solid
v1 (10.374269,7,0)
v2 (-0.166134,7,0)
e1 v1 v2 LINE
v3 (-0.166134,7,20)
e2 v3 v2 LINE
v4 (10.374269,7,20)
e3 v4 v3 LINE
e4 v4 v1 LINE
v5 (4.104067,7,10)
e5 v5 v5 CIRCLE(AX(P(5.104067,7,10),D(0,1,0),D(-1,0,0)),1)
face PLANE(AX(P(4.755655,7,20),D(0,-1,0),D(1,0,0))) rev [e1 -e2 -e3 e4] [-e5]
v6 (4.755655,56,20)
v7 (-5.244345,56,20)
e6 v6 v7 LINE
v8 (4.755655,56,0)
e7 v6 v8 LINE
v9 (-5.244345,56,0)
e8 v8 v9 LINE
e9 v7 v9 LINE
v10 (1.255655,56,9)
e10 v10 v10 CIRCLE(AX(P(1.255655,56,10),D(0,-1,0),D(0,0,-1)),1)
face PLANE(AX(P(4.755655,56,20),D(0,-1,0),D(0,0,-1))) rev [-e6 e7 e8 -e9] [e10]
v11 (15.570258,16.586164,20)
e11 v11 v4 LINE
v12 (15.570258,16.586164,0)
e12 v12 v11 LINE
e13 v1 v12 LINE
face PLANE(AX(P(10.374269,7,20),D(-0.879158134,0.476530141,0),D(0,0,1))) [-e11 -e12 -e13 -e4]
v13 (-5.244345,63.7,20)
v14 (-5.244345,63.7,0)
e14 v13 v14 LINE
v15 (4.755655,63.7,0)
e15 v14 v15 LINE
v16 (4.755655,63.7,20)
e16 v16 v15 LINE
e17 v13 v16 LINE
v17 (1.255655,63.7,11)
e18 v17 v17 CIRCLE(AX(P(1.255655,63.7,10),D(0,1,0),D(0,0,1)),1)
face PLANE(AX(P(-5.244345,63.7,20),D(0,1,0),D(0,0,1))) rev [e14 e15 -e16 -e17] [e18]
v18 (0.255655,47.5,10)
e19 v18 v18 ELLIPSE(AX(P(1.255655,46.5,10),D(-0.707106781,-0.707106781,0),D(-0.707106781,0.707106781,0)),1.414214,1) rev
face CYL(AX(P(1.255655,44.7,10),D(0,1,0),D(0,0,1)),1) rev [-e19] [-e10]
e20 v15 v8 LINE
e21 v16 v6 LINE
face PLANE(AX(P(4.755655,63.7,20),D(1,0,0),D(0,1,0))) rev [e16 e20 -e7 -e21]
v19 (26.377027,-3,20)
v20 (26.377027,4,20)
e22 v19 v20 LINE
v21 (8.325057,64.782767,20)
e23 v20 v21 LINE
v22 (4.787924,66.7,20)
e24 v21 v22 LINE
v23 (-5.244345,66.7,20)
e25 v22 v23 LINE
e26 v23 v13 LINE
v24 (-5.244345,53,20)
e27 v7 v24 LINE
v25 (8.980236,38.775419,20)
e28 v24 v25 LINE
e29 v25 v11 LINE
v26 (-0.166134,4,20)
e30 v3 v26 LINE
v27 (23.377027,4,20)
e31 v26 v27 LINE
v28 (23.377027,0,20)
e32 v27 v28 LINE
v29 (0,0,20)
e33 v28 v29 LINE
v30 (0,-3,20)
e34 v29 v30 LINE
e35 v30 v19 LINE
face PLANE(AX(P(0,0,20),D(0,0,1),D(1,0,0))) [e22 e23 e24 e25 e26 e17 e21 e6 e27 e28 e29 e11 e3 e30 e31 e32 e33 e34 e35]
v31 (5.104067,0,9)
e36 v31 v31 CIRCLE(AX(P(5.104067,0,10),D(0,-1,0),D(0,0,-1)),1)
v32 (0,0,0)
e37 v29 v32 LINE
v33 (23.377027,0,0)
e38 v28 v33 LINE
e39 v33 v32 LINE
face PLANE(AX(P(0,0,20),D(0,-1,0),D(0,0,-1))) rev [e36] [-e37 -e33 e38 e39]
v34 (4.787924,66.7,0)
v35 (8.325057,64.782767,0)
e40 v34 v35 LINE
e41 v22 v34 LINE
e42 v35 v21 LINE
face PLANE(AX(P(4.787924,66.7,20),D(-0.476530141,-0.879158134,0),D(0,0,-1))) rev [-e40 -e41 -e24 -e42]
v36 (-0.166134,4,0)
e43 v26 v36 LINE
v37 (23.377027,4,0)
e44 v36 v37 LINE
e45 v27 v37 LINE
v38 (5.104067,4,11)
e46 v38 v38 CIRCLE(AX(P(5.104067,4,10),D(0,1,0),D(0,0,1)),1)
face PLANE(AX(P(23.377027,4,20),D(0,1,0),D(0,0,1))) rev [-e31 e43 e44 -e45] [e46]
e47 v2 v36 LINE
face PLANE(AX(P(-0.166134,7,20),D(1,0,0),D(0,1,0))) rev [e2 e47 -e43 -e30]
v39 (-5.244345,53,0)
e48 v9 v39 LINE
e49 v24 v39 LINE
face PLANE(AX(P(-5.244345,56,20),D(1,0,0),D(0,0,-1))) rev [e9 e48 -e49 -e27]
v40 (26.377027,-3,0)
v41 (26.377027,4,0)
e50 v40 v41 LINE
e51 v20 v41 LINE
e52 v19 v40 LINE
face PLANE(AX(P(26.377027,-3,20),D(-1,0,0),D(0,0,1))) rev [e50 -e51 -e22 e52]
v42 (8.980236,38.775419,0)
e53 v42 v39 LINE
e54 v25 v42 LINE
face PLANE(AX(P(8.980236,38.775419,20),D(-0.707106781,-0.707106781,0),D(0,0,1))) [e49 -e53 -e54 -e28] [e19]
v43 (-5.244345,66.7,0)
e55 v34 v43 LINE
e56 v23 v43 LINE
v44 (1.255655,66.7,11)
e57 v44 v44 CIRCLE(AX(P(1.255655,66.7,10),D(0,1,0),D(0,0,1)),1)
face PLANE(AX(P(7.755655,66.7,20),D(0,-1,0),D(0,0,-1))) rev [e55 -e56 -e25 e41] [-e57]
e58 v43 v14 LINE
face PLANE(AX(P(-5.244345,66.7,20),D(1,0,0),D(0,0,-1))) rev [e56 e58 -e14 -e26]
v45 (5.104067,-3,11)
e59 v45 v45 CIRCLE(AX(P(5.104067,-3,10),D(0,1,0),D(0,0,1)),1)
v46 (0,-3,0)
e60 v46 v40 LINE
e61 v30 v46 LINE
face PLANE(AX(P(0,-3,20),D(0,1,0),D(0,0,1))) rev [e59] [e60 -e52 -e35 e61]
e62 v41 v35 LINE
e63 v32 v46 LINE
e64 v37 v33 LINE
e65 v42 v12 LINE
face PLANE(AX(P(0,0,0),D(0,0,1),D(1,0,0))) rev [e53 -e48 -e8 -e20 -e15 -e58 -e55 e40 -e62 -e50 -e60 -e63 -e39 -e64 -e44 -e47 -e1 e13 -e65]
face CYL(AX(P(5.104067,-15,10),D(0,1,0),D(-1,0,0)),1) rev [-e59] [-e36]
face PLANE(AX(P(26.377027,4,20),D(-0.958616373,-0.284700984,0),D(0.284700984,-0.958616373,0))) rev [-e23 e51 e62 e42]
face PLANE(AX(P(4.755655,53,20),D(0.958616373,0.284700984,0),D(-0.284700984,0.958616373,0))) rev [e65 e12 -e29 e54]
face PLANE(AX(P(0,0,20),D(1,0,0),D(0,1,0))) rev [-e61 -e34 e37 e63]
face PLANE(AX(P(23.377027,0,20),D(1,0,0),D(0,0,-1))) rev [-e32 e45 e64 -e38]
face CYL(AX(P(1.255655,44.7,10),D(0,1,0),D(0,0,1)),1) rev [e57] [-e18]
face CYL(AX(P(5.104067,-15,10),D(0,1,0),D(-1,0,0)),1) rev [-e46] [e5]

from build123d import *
from OCP.BRepFilletAPI import BRepFilletAPI_MakeChamfer

# Parameters (mm, degrees)
BOSS_EXTRUDE1_DEPTH = 20
CHAMFER1_SIZE       = 10
CHAMFER1_SIZE_2     = 14.838658038
CHAMFER1_SIZE_3     = 8.042998795
SKETCH2_R           = 1
CUT_EXTRUDE1_DEPTH  = 22
SKETCH3_R           = 1
CUT_EXTRUDE2_DEPTH  = 22
CHAMFER2_SIZE       = 2
CHAMFER2_SIZE2      = 2.967731608


with BuildPart() as part:
    # Sketch1 → Boss-Extrude1 (new body)
    with BuildSketch(Plane.XY):
        Polygon((0, 0), (23.377026873, 0), (23.377026873, 4), (-0.166134072, 4), (-0.166134072, 7), (4.755655282, 7), (18.417267614, 7), (4.755655282, 53), (-5.244344718, 53), (-5.244344718, 56), (4.755655282, 56), (4.755655282, 63.7), (-5.244344718, 63.7), (-5.244344718, 66.7), (7.755655282, 66.7), (26.377026873, 4), (26.377026873, -3), (0, -3), align=None)
    extrude(amount=BOSS_EXTRUDE1_DEPTH)

    # Chamfer1
    chamfer1_edges_1 = [part.edges().sort_by_distance(p)[0] for p in [
        (4.755655282, 53, 10),
    ]]
    chamfer1_side_1 = [part.faces().sort_by_distance(p)[0] for p in [
        (4.555655282, 53, 10),
    ]]
    chamfer1_edges_2 = [part.edges().sort_by_distance(p)[0] for p in [
        (18.417267614, 7, 10),
    ]]
    chamfer1_side_2 = [part.faces().sort_by_distance(p)[0] for p in [
        (18.37147062, 7.154203007, 10),
    ]]
    chamfer1 = BRepFilletAPI_MakeChamfer(part.part.solid().wrapped)
    for e in chamfer1_edges_1:
        chamfer1.Add(CHAMFER1_SIZE - 0.0001, CHAMFER1_SIZE_2 - 0.0001, e.wrapped, chamfer1_side_1[0].wrapped)
    for e in chamfer1_edges_2:
        chamfer1.Add(CHAMFER1_SIZE - 0.0001, CHAMFER1_SIZE_3 - 0.0001, e.wrapped, chamfer1_side_2[0].wrapped)
    add(Compound.cast(chamfer1.Shape()), mode=Mode.REPLACE)  # a hair under: the kernel refuses the full size

    # Sketch2 → Cut-Extrude1 (cut)
    with BuildSketch(Plane(origin=(0, 66.7, 0), x_dir=(1, 0, 0), z_dir=(0, 1, 0))):
        with Locations(Location((1.255655282, -10, 0), (0, 0, 180))):
            Circle(SKETCH2_R)
    extrude(amount=-CUT_EXTRUDE1_DEPTH, mode=Mode.SUBTRACT)

    # Sketch3 → Cut-Extrude2 (cut)
    with BuildSketch(Plane(origin=(0, 7, 0), x_dir=(1, 0, 0), z_dir=(0, 1, 0))):
        with Locations(Location((5.104067373, -10, 0), (0, 0, 270))):
            Circle(SKETCH3_R)
    extrude(amount=-CUT_EXTRUDE2_DEPTH, mode=Mode.SUBTRACT)

    # Chamfer2
    chamfer2_edges = [part.edges().sort_by_distance(p)[0] for p in [
        (7.755655282, 66.7, 10),
    ]]
    chamfer2_side = [part.faces().sort_by_distance(p)[0] for p in [
        (17.066341078, 35.35, 10),
    ]]
    chamfer(chamfer2_edges, length=CHAMFER2_SIZE, length2=CHAMFER2_SIZE2, reference=chamfer2_side[0])


solid = part.part
